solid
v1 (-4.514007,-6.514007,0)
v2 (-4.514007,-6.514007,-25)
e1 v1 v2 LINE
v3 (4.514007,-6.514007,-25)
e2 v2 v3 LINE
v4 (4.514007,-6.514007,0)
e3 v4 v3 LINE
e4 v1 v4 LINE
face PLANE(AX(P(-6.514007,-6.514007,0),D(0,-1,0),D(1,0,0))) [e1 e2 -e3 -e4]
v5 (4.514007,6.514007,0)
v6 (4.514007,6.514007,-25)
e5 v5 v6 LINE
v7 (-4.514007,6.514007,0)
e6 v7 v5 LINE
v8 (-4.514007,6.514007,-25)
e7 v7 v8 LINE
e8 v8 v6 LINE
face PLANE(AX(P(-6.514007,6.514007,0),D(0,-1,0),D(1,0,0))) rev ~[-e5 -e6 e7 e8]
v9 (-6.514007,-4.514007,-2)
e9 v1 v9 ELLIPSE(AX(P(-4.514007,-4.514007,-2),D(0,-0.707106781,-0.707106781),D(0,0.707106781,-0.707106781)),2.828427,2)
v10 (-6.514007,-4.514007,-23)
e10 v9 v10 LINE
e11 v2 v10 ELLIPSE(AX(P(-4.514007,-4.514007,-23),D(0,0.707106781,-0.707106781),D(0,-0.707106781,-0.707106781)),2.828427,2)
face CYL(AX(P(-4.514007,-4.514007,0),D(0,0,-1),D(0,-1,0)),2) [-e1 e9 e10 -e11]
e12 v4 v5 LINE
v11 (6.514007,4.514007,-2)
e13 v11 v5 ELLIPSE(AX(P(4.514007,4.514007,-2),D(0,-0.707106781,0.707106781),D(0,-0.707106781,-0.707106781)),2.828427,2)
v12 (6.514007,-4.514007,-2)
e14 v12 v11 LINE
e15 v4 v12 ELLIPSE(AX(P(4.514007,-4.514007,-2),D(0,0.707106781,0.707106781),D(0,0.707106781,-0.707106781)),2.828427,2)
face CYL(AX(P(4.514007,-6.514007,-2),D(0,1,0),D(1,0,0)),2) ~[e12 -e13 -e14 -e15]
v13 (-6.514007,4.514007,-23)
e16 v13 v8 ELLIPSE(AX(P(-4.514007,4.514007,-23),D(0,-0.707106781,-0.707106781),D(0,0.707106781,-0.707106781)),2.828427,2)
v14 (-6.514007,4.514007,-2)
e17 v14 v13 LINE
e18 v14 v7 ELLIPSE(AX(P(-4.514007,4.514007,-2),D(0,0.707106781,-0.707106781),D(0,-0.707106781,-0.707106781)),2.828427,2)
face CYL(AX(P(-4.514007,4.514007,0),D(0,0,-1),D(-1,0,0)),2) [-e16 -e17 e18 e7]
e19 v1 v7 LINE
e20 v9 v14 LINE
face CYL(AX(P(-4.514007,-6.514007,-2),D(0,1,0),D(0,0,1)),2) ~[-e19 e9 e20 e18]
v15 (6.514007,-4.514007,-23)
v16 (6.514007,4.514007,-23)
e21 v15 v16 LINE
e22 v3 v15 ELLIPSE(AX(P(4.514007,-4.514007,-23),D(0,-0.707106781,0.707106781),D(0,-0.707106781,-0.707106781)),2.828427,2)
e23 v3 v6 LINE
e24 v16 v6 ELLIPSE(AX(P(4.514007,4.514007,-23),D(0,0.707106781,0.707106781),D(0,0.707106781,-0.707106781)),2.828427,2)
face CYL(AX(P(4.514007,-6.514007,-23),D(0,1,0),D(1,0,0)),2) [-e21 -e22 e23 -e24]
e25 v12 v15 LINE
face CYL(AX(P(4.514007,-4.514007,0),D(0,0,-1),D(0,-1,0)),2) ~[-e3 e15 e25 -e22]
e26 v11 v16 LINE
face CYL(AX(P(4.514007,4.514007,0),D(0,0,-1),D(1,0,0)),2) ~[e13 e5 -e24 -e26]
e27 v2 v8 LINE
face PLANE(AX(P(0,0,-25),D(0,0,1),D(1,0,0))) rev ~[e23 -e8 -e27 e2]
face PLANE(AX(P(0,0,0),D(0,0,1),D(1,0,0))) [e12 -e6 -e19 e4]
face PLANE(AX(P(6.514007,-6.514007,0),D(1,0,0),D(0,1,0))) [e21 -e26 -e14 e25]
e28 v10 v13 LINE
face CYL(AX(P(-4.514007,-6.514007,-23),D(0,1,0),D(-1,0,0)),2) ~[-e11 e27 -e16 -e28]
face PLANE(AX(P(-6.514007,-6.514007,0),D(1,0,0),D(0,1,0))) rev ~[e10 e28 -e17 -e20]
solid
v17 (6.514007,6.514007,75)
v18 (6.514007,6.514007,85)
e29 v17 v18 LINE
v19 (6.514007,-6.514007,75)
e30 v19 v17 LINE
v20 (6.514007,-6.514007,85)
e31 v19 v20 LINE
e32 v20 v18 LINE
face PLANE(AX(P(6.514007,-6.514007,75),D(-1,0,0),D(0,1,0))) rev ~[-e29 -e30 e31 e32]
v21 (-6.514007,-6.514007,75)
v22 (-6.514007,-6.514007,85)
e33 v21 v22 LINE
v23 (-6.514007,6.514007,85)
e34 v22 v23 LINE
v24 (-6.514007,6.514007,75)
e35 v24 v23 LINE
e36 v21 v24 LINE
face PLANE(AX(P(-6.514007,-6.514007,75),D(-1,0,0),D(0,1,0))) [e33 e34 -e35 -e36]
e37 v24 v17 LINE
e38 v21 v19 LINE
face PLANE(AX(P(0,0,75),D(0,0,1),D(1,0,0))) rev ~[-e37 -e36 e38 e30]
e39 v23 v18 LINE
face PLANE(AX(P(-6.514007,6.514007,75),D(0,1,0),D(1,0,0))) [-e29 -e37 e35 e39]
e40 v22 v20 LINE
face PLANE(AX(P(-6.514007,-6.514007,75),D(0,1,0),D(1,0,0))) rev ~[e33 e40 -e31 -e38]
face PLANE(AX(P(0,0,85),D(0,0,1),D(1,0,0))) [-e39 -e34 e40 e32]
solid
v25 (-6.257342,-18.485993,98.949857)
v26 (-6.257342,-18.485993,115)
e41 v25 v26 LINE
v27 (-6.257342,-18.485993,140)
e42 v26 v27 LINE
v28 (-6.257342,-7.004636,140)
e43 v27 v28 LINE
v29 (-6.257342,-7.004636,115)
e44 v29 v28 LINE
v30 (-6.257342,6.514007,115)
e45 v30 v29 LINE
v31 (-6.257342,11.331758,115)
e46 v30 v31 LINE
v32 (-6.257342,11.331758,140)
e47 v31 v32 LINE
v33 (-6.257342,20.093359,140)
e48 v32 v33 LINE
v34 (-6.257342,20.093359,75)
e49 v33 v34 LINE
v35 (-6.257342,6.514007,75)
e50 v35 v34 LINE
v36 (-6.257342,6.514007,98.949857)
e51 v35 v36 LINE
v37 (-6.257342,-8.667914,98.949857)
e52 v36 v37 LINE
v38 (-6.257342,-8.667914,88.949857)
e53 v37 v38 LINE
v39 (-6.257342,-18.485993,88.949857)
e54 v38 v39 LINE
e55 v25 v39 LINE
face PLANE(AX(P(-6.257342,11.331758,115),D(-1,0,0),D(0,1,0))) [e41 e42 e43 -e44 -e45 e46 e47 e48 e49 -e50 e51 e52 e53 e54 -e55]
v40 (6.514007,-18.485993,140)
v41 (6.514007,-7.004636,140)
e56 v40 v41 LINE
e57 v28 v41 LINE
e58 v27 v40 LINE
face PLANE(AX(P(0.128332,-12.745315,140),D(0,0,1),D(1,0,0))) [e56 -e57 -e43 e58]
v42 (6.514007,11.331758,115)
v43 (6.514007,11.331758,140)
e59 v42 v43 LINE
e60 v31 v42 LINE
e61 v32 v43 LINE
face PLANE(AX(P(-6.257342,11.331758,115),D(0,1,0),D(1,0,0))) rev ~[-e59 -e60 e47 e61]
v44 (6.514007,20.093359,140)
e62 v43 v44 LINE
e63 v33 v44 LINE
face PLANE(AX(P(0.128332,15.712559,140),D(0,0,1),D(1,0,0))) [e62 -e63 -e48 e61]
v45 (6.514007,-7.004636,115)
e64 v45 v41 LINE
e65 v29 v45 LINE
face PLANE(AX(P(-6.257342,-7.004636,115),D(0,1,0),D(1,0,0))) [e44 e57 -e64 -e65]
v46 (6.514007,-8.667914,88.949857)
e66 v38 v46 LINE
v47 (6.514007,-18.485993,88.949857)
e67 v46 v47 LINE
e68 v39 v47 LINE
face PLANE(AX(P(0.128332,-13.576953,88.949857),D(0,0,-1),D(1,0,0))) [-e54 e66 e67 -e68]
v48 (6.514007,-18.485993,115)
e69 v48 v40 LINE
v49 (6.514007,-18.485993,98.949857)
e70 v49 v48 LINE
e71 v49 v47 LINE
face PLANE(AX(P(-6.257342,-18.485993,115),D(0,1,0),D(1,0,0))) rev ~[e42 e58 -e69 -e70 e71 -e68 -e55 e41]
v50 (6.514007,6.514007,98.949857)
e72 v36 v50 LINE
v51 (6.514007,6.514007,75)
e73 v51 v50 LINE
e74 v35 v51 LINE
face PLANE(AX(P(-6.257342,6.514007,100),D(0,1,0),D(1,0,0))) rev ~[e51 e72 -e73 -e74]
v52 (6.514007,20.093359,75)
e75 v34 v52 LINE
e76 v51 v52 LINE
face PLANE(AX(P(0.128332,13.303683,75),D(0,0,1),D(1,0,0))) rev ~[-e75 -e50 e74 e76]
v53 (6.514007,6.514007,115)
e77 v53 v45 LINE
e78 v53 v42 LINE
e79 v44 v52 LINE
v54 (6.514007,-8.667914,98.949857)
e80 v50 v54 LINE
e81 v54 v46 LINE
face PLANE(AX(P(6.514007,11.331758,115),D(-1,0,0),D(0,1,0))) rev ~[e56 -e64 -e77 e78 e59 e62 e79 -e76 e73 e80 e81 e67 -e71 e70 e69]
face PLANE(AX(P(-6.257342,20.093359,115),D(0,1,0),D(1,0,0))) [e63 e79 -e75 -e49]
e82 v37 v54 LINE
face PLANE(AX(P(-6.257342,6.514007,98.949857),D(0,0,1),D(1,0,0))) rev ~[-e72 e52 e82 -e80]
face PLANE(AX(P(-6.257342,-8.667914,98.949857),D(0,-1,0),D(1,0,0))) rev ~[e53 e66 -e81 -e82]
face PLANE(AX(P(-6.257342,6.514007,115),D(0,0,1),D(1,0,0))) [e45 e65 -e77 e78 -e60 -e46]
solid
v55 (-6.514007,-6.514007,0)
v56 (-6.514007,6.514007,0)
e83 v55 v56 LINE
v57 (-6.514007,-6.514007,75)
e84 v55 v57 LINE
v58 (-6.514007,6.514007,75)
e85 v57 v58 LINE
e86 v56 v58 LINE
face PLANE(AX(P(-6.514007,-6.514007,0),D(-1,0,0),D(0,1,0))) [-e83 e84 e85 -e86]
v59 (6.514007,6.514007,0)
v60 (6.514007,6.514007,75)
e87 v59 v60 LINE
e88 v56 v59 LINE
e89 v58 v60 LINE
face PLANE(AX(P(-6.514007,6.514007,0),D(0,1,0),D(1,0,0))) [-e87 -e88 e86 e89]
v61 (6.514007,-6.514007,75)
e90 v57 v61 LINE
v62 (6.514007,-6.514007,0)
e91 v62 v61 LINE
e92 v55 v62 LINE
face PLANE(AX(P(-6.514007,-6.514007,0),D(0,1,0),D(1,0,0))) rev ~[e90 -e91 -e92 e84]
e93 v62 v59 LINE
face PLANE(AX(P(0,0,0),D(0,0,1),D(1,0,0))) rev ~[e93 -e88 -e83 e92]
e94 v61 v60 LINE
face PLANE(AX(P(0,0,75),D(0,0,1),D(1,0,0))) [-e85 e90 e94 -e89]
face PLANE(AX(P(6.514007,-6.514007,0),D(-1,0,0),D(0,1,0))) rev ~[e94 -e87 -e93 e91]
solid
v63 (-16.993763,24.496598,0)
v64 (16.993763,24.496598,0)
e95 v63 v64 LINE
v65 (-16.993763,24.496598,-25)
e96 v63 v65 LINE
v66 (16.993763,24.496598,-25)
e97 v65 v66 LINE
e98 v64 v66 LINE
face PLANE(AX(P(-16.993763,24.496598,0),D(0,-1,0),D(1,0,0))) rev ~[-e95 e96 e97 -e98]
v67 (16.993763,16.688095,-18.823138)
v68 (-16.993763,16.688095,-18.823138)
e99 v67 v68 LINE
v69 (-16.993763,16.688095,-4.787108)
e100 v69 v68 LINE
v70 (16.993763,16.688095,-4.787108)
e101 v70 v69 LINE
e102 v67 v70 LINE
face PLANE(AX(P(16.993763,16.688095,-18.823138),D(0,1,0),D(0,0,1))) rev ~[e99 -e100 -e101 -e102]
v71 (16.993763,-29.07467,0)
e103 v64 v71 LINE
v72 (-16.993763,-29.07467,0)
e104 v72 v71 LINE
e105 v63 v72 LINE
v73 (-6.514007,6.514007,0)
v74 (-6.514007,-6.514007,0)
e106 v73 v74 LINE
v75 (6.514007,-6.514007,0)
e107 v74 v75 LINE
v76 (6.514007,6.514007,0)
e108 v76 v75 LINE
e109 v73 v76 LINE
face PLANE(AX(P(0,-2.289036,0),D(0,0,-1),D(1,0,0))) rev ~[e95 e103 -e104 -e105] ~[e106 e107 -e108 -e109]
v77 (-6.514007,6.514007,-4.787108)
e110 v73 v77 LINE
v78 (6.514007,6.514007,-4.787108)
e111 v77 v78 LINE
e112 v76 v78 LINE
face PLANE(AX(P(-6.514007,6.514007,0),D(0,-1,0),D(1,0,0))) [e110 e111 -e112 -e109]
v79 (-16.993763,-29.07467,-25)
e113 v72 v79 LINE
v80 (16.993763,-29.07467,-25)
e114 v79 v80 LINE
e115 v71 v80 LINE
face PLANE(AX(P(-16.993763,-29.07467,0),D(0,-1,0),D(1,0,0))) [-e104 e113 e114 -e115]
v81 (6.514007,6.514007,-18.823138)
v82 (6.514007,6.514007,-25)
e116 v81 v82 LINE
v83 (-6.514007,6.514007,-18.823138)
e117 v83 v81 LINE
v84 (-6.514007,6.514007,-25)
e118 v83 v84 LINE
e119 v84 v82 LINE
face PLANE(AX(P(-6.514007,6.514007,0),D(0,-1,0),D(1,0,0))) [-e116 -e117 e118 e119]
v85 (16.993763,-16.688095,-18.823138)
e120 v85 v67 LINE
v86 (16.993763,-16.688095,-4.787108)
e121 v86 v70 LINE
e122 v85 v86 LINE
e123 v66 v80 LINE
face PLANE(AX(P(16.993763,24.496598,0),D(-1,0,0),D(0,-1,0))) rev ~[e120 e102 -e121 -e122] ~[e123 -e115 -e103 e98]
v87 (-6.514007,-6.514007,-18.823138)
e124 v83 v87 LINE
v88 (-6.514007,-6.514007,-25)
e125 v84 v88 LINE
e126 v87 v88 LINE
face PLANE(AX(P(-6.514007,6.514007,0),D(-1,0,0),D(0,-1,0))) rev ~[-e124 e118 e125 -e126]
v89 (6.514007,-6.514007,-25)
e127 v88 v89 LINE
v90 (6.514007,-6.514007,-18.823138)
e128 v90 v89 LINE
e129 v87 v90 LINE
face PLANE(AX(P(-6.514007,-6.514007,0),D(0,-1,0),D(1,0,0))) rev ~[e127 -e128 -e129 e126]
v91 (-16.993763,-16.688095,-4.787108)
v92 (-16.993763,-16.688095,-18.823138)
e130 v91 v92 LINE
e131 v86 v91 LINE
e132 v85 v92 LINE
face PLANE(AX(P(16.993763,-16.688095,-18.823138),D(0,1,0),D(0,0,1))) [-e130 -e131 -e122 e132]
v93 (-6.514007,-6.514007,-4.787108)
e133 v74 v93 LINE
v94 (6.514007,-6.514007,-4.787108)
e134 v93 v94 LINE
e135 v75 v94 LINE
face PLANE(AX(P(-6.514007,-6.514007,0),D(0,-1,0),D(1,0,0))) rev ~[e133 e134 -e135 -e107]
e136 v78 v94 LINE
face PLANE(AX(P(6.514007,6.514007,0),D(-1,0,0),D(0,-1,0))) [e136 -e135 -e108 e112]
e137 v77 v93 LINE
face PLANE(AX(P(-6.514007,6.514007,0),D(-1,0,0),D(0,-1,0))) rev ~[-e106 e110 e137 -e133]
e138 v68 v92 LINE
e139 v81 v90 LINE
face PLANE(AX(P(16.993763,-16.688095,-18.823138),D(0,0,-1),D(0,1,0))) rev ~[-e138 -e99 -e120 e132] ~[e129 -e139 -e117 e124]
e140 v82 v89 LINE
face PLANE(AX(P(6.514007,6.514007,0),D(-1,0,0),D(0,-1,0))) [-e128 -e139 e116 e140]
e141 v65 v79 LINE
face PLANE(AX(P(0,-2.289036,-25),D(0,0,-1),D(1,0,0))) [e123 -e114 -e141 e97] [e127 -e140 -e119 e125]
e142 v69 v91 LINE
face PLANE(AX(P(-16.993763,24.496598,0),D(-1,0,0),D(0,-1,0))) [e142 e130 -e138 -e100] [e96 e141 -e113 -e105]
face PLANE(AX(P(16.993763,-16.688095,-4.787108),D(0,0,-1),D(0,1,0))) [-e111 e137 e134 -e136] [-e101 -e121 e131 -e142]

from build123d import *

# Parameters (mm, degrees)
F0_W      = 13.0280144513
F0_H      = 13.0280144513
F1_DEPTH  = 75
F2_W      = 33.9875258505
F2_H      = 53.5712684505
F2_W_2    = 13.0280144513
F2_H_2    = 13.0280144513
F3_DEPTH  = 25
F4_DEPTH  = 25
F5_W      = 33.3761908114
F5_H      = 14.0360295773
F6_DEPTH  = 34
F7_W      = 12.7713497204
F7_H      = 13.5793518275
F8_DEPTH  = 25
F9_DEPTH  = 10
F10_DEPTH = 15
F11_W     = 12.7713497204
F11_H     = 16.0501429439
F12_DEPTH = 25
F13_W     = 12.7713497204
F13_H     = 9.8180785775
F14_DEPTH = 10
F15_W     = 12.7713497204
F15_H     = 11.4813564345
F16_DEPTH = 25
F17_W     = 12.7713497204
F17_H     = 8.7616005912
F18_DEPTH = 25
F19_R     = 2
F20_R     = 2


with BuildPart() as f1:
    # F0 (on Top) → F1 (new body)
    with BuildSketch(Plane.XY):
        Rectangle(F0_W, F0_H)
    extrude(amount=F1_DEPTH)


with BuildPart() as f3:
    # F2 (on face) → F3 (new body)
    with BuildSketch(Plane(origin=(0, 0, 0), x_dir=(1, 0, 0), z_dir=(0, 0, -1))):
        with Locations((0, 2.289036056)):
            Rectangle(F2_W, F2_H)
        Rectangle(F2_W_2, F2_H_2, mode=Mode.SUBTRACT)
    extrude(amount=F3_DEPTH)

    # F5 (on face) → F6 (cut)
    with BuildSketch(Plane.YZ.offset(16.9937629253)):
        with Locations((0, -11.8051227182)):
            Rectangle(F5_W, F5_H)
    extrude(amount=-F6_DEPTH, mode=Mode.SUBTRACT)


with BuildPart() as f4:
    # F4 (new): a face of the model
    f4_faces = [f1.part.faces().sort_by_distance(p)[0] for p in [
        (0, 0, 0),
    ]]
    extrude(f4_faces, amount=F4_DEPTH)

    # F19
    f19_edges = [f4.edges().sort_by_distance(p)[0] for p in [
        (6.514007, -6.514007, -12.5),
        (6.514007, 6.514007, -12.5),
        (6.514007, 0, 0),
        (6.514007, 0, -25),
    ]]
    fillet(f19_edges, radius=F19_R)

    # F20
    f20_edges = [f4.edges().sort_by_distance(p)[0] for p in [
        (-6.514007, 6.514007, -12.5),
        (-6.514007, -6.514007, -12.5),
        (-6.514007, 0, 0),
        (-6.514007, 0, -25),
    ]]
    fillet(f20_edges, radius=F20_R)


with BuildPart() as f8:
    # F7 (on face) → F8 (new body)
    with BuildSketch(Plane.XY.offset(75)):
        with Locations((0.1283323654, 13.3036831394)):
            Rectangle(F7_W, F7_H)
    extrude(amount=F8_DEPTH)

    # F10 (add): a face of the model
    f10_faces = [f8.faces().sort_by_distance(p)[0] for p in [
        (0.1283323654, 13.3036831394, 100),
    ]]
    extrude(f10_faces, amount=F10_DEPTH)

    # F11 (on face) → F12 (join)
    with BuildSketch(Plane.XZ.offset(-6.5140072256)):
        with Locations((0.1283323654, 106.9749285281)):
            Rectangle(F11_W, F11_H)
    extrude(amount=F12_DEPTH)

    # F13 (on face) → F14 (join)
    with BuildSketch(Plane(origin=(0, 0, 98.9498570561), x_dir=(1, 0, 0), z_dir=(0, 0, -1))):
        with Locations((0.1283323654, 13.5769534856)):
            Rectangle(F13_W, F13_H)
    extrude(amount=F14_DEPTH)

    # F15 (on face) → F16 (join)
    with BuildSketch(Plane.XY.offset(115)):
        with Locations((0.1283323654, -12.7453145571)):
            Rectangle(F15_W, F15_H)
    extrude(amount=F16_DEPTH)

    # F17 (on face) → F18 (join)
    with BuildSketch(Plane.XY.offset(115)):
        with Locations((0.1283323654, 15.7125587575)):
            Rectangle(F17_W, F17_H)
    extrude(amount=F18_DEPTH)


with BuildPart() as f9:
    # F9 (new): a face of the model
    f9_faces = [f1.part.faces().sort_by_distance(p)[0] for p in [
        (0, 0, 75),
    ]]
    extrude(f9_faces, amount=F9_DEPTH)


solid = Compound([f1.part, f3.part, f4.part, f8.part, f9.part])
